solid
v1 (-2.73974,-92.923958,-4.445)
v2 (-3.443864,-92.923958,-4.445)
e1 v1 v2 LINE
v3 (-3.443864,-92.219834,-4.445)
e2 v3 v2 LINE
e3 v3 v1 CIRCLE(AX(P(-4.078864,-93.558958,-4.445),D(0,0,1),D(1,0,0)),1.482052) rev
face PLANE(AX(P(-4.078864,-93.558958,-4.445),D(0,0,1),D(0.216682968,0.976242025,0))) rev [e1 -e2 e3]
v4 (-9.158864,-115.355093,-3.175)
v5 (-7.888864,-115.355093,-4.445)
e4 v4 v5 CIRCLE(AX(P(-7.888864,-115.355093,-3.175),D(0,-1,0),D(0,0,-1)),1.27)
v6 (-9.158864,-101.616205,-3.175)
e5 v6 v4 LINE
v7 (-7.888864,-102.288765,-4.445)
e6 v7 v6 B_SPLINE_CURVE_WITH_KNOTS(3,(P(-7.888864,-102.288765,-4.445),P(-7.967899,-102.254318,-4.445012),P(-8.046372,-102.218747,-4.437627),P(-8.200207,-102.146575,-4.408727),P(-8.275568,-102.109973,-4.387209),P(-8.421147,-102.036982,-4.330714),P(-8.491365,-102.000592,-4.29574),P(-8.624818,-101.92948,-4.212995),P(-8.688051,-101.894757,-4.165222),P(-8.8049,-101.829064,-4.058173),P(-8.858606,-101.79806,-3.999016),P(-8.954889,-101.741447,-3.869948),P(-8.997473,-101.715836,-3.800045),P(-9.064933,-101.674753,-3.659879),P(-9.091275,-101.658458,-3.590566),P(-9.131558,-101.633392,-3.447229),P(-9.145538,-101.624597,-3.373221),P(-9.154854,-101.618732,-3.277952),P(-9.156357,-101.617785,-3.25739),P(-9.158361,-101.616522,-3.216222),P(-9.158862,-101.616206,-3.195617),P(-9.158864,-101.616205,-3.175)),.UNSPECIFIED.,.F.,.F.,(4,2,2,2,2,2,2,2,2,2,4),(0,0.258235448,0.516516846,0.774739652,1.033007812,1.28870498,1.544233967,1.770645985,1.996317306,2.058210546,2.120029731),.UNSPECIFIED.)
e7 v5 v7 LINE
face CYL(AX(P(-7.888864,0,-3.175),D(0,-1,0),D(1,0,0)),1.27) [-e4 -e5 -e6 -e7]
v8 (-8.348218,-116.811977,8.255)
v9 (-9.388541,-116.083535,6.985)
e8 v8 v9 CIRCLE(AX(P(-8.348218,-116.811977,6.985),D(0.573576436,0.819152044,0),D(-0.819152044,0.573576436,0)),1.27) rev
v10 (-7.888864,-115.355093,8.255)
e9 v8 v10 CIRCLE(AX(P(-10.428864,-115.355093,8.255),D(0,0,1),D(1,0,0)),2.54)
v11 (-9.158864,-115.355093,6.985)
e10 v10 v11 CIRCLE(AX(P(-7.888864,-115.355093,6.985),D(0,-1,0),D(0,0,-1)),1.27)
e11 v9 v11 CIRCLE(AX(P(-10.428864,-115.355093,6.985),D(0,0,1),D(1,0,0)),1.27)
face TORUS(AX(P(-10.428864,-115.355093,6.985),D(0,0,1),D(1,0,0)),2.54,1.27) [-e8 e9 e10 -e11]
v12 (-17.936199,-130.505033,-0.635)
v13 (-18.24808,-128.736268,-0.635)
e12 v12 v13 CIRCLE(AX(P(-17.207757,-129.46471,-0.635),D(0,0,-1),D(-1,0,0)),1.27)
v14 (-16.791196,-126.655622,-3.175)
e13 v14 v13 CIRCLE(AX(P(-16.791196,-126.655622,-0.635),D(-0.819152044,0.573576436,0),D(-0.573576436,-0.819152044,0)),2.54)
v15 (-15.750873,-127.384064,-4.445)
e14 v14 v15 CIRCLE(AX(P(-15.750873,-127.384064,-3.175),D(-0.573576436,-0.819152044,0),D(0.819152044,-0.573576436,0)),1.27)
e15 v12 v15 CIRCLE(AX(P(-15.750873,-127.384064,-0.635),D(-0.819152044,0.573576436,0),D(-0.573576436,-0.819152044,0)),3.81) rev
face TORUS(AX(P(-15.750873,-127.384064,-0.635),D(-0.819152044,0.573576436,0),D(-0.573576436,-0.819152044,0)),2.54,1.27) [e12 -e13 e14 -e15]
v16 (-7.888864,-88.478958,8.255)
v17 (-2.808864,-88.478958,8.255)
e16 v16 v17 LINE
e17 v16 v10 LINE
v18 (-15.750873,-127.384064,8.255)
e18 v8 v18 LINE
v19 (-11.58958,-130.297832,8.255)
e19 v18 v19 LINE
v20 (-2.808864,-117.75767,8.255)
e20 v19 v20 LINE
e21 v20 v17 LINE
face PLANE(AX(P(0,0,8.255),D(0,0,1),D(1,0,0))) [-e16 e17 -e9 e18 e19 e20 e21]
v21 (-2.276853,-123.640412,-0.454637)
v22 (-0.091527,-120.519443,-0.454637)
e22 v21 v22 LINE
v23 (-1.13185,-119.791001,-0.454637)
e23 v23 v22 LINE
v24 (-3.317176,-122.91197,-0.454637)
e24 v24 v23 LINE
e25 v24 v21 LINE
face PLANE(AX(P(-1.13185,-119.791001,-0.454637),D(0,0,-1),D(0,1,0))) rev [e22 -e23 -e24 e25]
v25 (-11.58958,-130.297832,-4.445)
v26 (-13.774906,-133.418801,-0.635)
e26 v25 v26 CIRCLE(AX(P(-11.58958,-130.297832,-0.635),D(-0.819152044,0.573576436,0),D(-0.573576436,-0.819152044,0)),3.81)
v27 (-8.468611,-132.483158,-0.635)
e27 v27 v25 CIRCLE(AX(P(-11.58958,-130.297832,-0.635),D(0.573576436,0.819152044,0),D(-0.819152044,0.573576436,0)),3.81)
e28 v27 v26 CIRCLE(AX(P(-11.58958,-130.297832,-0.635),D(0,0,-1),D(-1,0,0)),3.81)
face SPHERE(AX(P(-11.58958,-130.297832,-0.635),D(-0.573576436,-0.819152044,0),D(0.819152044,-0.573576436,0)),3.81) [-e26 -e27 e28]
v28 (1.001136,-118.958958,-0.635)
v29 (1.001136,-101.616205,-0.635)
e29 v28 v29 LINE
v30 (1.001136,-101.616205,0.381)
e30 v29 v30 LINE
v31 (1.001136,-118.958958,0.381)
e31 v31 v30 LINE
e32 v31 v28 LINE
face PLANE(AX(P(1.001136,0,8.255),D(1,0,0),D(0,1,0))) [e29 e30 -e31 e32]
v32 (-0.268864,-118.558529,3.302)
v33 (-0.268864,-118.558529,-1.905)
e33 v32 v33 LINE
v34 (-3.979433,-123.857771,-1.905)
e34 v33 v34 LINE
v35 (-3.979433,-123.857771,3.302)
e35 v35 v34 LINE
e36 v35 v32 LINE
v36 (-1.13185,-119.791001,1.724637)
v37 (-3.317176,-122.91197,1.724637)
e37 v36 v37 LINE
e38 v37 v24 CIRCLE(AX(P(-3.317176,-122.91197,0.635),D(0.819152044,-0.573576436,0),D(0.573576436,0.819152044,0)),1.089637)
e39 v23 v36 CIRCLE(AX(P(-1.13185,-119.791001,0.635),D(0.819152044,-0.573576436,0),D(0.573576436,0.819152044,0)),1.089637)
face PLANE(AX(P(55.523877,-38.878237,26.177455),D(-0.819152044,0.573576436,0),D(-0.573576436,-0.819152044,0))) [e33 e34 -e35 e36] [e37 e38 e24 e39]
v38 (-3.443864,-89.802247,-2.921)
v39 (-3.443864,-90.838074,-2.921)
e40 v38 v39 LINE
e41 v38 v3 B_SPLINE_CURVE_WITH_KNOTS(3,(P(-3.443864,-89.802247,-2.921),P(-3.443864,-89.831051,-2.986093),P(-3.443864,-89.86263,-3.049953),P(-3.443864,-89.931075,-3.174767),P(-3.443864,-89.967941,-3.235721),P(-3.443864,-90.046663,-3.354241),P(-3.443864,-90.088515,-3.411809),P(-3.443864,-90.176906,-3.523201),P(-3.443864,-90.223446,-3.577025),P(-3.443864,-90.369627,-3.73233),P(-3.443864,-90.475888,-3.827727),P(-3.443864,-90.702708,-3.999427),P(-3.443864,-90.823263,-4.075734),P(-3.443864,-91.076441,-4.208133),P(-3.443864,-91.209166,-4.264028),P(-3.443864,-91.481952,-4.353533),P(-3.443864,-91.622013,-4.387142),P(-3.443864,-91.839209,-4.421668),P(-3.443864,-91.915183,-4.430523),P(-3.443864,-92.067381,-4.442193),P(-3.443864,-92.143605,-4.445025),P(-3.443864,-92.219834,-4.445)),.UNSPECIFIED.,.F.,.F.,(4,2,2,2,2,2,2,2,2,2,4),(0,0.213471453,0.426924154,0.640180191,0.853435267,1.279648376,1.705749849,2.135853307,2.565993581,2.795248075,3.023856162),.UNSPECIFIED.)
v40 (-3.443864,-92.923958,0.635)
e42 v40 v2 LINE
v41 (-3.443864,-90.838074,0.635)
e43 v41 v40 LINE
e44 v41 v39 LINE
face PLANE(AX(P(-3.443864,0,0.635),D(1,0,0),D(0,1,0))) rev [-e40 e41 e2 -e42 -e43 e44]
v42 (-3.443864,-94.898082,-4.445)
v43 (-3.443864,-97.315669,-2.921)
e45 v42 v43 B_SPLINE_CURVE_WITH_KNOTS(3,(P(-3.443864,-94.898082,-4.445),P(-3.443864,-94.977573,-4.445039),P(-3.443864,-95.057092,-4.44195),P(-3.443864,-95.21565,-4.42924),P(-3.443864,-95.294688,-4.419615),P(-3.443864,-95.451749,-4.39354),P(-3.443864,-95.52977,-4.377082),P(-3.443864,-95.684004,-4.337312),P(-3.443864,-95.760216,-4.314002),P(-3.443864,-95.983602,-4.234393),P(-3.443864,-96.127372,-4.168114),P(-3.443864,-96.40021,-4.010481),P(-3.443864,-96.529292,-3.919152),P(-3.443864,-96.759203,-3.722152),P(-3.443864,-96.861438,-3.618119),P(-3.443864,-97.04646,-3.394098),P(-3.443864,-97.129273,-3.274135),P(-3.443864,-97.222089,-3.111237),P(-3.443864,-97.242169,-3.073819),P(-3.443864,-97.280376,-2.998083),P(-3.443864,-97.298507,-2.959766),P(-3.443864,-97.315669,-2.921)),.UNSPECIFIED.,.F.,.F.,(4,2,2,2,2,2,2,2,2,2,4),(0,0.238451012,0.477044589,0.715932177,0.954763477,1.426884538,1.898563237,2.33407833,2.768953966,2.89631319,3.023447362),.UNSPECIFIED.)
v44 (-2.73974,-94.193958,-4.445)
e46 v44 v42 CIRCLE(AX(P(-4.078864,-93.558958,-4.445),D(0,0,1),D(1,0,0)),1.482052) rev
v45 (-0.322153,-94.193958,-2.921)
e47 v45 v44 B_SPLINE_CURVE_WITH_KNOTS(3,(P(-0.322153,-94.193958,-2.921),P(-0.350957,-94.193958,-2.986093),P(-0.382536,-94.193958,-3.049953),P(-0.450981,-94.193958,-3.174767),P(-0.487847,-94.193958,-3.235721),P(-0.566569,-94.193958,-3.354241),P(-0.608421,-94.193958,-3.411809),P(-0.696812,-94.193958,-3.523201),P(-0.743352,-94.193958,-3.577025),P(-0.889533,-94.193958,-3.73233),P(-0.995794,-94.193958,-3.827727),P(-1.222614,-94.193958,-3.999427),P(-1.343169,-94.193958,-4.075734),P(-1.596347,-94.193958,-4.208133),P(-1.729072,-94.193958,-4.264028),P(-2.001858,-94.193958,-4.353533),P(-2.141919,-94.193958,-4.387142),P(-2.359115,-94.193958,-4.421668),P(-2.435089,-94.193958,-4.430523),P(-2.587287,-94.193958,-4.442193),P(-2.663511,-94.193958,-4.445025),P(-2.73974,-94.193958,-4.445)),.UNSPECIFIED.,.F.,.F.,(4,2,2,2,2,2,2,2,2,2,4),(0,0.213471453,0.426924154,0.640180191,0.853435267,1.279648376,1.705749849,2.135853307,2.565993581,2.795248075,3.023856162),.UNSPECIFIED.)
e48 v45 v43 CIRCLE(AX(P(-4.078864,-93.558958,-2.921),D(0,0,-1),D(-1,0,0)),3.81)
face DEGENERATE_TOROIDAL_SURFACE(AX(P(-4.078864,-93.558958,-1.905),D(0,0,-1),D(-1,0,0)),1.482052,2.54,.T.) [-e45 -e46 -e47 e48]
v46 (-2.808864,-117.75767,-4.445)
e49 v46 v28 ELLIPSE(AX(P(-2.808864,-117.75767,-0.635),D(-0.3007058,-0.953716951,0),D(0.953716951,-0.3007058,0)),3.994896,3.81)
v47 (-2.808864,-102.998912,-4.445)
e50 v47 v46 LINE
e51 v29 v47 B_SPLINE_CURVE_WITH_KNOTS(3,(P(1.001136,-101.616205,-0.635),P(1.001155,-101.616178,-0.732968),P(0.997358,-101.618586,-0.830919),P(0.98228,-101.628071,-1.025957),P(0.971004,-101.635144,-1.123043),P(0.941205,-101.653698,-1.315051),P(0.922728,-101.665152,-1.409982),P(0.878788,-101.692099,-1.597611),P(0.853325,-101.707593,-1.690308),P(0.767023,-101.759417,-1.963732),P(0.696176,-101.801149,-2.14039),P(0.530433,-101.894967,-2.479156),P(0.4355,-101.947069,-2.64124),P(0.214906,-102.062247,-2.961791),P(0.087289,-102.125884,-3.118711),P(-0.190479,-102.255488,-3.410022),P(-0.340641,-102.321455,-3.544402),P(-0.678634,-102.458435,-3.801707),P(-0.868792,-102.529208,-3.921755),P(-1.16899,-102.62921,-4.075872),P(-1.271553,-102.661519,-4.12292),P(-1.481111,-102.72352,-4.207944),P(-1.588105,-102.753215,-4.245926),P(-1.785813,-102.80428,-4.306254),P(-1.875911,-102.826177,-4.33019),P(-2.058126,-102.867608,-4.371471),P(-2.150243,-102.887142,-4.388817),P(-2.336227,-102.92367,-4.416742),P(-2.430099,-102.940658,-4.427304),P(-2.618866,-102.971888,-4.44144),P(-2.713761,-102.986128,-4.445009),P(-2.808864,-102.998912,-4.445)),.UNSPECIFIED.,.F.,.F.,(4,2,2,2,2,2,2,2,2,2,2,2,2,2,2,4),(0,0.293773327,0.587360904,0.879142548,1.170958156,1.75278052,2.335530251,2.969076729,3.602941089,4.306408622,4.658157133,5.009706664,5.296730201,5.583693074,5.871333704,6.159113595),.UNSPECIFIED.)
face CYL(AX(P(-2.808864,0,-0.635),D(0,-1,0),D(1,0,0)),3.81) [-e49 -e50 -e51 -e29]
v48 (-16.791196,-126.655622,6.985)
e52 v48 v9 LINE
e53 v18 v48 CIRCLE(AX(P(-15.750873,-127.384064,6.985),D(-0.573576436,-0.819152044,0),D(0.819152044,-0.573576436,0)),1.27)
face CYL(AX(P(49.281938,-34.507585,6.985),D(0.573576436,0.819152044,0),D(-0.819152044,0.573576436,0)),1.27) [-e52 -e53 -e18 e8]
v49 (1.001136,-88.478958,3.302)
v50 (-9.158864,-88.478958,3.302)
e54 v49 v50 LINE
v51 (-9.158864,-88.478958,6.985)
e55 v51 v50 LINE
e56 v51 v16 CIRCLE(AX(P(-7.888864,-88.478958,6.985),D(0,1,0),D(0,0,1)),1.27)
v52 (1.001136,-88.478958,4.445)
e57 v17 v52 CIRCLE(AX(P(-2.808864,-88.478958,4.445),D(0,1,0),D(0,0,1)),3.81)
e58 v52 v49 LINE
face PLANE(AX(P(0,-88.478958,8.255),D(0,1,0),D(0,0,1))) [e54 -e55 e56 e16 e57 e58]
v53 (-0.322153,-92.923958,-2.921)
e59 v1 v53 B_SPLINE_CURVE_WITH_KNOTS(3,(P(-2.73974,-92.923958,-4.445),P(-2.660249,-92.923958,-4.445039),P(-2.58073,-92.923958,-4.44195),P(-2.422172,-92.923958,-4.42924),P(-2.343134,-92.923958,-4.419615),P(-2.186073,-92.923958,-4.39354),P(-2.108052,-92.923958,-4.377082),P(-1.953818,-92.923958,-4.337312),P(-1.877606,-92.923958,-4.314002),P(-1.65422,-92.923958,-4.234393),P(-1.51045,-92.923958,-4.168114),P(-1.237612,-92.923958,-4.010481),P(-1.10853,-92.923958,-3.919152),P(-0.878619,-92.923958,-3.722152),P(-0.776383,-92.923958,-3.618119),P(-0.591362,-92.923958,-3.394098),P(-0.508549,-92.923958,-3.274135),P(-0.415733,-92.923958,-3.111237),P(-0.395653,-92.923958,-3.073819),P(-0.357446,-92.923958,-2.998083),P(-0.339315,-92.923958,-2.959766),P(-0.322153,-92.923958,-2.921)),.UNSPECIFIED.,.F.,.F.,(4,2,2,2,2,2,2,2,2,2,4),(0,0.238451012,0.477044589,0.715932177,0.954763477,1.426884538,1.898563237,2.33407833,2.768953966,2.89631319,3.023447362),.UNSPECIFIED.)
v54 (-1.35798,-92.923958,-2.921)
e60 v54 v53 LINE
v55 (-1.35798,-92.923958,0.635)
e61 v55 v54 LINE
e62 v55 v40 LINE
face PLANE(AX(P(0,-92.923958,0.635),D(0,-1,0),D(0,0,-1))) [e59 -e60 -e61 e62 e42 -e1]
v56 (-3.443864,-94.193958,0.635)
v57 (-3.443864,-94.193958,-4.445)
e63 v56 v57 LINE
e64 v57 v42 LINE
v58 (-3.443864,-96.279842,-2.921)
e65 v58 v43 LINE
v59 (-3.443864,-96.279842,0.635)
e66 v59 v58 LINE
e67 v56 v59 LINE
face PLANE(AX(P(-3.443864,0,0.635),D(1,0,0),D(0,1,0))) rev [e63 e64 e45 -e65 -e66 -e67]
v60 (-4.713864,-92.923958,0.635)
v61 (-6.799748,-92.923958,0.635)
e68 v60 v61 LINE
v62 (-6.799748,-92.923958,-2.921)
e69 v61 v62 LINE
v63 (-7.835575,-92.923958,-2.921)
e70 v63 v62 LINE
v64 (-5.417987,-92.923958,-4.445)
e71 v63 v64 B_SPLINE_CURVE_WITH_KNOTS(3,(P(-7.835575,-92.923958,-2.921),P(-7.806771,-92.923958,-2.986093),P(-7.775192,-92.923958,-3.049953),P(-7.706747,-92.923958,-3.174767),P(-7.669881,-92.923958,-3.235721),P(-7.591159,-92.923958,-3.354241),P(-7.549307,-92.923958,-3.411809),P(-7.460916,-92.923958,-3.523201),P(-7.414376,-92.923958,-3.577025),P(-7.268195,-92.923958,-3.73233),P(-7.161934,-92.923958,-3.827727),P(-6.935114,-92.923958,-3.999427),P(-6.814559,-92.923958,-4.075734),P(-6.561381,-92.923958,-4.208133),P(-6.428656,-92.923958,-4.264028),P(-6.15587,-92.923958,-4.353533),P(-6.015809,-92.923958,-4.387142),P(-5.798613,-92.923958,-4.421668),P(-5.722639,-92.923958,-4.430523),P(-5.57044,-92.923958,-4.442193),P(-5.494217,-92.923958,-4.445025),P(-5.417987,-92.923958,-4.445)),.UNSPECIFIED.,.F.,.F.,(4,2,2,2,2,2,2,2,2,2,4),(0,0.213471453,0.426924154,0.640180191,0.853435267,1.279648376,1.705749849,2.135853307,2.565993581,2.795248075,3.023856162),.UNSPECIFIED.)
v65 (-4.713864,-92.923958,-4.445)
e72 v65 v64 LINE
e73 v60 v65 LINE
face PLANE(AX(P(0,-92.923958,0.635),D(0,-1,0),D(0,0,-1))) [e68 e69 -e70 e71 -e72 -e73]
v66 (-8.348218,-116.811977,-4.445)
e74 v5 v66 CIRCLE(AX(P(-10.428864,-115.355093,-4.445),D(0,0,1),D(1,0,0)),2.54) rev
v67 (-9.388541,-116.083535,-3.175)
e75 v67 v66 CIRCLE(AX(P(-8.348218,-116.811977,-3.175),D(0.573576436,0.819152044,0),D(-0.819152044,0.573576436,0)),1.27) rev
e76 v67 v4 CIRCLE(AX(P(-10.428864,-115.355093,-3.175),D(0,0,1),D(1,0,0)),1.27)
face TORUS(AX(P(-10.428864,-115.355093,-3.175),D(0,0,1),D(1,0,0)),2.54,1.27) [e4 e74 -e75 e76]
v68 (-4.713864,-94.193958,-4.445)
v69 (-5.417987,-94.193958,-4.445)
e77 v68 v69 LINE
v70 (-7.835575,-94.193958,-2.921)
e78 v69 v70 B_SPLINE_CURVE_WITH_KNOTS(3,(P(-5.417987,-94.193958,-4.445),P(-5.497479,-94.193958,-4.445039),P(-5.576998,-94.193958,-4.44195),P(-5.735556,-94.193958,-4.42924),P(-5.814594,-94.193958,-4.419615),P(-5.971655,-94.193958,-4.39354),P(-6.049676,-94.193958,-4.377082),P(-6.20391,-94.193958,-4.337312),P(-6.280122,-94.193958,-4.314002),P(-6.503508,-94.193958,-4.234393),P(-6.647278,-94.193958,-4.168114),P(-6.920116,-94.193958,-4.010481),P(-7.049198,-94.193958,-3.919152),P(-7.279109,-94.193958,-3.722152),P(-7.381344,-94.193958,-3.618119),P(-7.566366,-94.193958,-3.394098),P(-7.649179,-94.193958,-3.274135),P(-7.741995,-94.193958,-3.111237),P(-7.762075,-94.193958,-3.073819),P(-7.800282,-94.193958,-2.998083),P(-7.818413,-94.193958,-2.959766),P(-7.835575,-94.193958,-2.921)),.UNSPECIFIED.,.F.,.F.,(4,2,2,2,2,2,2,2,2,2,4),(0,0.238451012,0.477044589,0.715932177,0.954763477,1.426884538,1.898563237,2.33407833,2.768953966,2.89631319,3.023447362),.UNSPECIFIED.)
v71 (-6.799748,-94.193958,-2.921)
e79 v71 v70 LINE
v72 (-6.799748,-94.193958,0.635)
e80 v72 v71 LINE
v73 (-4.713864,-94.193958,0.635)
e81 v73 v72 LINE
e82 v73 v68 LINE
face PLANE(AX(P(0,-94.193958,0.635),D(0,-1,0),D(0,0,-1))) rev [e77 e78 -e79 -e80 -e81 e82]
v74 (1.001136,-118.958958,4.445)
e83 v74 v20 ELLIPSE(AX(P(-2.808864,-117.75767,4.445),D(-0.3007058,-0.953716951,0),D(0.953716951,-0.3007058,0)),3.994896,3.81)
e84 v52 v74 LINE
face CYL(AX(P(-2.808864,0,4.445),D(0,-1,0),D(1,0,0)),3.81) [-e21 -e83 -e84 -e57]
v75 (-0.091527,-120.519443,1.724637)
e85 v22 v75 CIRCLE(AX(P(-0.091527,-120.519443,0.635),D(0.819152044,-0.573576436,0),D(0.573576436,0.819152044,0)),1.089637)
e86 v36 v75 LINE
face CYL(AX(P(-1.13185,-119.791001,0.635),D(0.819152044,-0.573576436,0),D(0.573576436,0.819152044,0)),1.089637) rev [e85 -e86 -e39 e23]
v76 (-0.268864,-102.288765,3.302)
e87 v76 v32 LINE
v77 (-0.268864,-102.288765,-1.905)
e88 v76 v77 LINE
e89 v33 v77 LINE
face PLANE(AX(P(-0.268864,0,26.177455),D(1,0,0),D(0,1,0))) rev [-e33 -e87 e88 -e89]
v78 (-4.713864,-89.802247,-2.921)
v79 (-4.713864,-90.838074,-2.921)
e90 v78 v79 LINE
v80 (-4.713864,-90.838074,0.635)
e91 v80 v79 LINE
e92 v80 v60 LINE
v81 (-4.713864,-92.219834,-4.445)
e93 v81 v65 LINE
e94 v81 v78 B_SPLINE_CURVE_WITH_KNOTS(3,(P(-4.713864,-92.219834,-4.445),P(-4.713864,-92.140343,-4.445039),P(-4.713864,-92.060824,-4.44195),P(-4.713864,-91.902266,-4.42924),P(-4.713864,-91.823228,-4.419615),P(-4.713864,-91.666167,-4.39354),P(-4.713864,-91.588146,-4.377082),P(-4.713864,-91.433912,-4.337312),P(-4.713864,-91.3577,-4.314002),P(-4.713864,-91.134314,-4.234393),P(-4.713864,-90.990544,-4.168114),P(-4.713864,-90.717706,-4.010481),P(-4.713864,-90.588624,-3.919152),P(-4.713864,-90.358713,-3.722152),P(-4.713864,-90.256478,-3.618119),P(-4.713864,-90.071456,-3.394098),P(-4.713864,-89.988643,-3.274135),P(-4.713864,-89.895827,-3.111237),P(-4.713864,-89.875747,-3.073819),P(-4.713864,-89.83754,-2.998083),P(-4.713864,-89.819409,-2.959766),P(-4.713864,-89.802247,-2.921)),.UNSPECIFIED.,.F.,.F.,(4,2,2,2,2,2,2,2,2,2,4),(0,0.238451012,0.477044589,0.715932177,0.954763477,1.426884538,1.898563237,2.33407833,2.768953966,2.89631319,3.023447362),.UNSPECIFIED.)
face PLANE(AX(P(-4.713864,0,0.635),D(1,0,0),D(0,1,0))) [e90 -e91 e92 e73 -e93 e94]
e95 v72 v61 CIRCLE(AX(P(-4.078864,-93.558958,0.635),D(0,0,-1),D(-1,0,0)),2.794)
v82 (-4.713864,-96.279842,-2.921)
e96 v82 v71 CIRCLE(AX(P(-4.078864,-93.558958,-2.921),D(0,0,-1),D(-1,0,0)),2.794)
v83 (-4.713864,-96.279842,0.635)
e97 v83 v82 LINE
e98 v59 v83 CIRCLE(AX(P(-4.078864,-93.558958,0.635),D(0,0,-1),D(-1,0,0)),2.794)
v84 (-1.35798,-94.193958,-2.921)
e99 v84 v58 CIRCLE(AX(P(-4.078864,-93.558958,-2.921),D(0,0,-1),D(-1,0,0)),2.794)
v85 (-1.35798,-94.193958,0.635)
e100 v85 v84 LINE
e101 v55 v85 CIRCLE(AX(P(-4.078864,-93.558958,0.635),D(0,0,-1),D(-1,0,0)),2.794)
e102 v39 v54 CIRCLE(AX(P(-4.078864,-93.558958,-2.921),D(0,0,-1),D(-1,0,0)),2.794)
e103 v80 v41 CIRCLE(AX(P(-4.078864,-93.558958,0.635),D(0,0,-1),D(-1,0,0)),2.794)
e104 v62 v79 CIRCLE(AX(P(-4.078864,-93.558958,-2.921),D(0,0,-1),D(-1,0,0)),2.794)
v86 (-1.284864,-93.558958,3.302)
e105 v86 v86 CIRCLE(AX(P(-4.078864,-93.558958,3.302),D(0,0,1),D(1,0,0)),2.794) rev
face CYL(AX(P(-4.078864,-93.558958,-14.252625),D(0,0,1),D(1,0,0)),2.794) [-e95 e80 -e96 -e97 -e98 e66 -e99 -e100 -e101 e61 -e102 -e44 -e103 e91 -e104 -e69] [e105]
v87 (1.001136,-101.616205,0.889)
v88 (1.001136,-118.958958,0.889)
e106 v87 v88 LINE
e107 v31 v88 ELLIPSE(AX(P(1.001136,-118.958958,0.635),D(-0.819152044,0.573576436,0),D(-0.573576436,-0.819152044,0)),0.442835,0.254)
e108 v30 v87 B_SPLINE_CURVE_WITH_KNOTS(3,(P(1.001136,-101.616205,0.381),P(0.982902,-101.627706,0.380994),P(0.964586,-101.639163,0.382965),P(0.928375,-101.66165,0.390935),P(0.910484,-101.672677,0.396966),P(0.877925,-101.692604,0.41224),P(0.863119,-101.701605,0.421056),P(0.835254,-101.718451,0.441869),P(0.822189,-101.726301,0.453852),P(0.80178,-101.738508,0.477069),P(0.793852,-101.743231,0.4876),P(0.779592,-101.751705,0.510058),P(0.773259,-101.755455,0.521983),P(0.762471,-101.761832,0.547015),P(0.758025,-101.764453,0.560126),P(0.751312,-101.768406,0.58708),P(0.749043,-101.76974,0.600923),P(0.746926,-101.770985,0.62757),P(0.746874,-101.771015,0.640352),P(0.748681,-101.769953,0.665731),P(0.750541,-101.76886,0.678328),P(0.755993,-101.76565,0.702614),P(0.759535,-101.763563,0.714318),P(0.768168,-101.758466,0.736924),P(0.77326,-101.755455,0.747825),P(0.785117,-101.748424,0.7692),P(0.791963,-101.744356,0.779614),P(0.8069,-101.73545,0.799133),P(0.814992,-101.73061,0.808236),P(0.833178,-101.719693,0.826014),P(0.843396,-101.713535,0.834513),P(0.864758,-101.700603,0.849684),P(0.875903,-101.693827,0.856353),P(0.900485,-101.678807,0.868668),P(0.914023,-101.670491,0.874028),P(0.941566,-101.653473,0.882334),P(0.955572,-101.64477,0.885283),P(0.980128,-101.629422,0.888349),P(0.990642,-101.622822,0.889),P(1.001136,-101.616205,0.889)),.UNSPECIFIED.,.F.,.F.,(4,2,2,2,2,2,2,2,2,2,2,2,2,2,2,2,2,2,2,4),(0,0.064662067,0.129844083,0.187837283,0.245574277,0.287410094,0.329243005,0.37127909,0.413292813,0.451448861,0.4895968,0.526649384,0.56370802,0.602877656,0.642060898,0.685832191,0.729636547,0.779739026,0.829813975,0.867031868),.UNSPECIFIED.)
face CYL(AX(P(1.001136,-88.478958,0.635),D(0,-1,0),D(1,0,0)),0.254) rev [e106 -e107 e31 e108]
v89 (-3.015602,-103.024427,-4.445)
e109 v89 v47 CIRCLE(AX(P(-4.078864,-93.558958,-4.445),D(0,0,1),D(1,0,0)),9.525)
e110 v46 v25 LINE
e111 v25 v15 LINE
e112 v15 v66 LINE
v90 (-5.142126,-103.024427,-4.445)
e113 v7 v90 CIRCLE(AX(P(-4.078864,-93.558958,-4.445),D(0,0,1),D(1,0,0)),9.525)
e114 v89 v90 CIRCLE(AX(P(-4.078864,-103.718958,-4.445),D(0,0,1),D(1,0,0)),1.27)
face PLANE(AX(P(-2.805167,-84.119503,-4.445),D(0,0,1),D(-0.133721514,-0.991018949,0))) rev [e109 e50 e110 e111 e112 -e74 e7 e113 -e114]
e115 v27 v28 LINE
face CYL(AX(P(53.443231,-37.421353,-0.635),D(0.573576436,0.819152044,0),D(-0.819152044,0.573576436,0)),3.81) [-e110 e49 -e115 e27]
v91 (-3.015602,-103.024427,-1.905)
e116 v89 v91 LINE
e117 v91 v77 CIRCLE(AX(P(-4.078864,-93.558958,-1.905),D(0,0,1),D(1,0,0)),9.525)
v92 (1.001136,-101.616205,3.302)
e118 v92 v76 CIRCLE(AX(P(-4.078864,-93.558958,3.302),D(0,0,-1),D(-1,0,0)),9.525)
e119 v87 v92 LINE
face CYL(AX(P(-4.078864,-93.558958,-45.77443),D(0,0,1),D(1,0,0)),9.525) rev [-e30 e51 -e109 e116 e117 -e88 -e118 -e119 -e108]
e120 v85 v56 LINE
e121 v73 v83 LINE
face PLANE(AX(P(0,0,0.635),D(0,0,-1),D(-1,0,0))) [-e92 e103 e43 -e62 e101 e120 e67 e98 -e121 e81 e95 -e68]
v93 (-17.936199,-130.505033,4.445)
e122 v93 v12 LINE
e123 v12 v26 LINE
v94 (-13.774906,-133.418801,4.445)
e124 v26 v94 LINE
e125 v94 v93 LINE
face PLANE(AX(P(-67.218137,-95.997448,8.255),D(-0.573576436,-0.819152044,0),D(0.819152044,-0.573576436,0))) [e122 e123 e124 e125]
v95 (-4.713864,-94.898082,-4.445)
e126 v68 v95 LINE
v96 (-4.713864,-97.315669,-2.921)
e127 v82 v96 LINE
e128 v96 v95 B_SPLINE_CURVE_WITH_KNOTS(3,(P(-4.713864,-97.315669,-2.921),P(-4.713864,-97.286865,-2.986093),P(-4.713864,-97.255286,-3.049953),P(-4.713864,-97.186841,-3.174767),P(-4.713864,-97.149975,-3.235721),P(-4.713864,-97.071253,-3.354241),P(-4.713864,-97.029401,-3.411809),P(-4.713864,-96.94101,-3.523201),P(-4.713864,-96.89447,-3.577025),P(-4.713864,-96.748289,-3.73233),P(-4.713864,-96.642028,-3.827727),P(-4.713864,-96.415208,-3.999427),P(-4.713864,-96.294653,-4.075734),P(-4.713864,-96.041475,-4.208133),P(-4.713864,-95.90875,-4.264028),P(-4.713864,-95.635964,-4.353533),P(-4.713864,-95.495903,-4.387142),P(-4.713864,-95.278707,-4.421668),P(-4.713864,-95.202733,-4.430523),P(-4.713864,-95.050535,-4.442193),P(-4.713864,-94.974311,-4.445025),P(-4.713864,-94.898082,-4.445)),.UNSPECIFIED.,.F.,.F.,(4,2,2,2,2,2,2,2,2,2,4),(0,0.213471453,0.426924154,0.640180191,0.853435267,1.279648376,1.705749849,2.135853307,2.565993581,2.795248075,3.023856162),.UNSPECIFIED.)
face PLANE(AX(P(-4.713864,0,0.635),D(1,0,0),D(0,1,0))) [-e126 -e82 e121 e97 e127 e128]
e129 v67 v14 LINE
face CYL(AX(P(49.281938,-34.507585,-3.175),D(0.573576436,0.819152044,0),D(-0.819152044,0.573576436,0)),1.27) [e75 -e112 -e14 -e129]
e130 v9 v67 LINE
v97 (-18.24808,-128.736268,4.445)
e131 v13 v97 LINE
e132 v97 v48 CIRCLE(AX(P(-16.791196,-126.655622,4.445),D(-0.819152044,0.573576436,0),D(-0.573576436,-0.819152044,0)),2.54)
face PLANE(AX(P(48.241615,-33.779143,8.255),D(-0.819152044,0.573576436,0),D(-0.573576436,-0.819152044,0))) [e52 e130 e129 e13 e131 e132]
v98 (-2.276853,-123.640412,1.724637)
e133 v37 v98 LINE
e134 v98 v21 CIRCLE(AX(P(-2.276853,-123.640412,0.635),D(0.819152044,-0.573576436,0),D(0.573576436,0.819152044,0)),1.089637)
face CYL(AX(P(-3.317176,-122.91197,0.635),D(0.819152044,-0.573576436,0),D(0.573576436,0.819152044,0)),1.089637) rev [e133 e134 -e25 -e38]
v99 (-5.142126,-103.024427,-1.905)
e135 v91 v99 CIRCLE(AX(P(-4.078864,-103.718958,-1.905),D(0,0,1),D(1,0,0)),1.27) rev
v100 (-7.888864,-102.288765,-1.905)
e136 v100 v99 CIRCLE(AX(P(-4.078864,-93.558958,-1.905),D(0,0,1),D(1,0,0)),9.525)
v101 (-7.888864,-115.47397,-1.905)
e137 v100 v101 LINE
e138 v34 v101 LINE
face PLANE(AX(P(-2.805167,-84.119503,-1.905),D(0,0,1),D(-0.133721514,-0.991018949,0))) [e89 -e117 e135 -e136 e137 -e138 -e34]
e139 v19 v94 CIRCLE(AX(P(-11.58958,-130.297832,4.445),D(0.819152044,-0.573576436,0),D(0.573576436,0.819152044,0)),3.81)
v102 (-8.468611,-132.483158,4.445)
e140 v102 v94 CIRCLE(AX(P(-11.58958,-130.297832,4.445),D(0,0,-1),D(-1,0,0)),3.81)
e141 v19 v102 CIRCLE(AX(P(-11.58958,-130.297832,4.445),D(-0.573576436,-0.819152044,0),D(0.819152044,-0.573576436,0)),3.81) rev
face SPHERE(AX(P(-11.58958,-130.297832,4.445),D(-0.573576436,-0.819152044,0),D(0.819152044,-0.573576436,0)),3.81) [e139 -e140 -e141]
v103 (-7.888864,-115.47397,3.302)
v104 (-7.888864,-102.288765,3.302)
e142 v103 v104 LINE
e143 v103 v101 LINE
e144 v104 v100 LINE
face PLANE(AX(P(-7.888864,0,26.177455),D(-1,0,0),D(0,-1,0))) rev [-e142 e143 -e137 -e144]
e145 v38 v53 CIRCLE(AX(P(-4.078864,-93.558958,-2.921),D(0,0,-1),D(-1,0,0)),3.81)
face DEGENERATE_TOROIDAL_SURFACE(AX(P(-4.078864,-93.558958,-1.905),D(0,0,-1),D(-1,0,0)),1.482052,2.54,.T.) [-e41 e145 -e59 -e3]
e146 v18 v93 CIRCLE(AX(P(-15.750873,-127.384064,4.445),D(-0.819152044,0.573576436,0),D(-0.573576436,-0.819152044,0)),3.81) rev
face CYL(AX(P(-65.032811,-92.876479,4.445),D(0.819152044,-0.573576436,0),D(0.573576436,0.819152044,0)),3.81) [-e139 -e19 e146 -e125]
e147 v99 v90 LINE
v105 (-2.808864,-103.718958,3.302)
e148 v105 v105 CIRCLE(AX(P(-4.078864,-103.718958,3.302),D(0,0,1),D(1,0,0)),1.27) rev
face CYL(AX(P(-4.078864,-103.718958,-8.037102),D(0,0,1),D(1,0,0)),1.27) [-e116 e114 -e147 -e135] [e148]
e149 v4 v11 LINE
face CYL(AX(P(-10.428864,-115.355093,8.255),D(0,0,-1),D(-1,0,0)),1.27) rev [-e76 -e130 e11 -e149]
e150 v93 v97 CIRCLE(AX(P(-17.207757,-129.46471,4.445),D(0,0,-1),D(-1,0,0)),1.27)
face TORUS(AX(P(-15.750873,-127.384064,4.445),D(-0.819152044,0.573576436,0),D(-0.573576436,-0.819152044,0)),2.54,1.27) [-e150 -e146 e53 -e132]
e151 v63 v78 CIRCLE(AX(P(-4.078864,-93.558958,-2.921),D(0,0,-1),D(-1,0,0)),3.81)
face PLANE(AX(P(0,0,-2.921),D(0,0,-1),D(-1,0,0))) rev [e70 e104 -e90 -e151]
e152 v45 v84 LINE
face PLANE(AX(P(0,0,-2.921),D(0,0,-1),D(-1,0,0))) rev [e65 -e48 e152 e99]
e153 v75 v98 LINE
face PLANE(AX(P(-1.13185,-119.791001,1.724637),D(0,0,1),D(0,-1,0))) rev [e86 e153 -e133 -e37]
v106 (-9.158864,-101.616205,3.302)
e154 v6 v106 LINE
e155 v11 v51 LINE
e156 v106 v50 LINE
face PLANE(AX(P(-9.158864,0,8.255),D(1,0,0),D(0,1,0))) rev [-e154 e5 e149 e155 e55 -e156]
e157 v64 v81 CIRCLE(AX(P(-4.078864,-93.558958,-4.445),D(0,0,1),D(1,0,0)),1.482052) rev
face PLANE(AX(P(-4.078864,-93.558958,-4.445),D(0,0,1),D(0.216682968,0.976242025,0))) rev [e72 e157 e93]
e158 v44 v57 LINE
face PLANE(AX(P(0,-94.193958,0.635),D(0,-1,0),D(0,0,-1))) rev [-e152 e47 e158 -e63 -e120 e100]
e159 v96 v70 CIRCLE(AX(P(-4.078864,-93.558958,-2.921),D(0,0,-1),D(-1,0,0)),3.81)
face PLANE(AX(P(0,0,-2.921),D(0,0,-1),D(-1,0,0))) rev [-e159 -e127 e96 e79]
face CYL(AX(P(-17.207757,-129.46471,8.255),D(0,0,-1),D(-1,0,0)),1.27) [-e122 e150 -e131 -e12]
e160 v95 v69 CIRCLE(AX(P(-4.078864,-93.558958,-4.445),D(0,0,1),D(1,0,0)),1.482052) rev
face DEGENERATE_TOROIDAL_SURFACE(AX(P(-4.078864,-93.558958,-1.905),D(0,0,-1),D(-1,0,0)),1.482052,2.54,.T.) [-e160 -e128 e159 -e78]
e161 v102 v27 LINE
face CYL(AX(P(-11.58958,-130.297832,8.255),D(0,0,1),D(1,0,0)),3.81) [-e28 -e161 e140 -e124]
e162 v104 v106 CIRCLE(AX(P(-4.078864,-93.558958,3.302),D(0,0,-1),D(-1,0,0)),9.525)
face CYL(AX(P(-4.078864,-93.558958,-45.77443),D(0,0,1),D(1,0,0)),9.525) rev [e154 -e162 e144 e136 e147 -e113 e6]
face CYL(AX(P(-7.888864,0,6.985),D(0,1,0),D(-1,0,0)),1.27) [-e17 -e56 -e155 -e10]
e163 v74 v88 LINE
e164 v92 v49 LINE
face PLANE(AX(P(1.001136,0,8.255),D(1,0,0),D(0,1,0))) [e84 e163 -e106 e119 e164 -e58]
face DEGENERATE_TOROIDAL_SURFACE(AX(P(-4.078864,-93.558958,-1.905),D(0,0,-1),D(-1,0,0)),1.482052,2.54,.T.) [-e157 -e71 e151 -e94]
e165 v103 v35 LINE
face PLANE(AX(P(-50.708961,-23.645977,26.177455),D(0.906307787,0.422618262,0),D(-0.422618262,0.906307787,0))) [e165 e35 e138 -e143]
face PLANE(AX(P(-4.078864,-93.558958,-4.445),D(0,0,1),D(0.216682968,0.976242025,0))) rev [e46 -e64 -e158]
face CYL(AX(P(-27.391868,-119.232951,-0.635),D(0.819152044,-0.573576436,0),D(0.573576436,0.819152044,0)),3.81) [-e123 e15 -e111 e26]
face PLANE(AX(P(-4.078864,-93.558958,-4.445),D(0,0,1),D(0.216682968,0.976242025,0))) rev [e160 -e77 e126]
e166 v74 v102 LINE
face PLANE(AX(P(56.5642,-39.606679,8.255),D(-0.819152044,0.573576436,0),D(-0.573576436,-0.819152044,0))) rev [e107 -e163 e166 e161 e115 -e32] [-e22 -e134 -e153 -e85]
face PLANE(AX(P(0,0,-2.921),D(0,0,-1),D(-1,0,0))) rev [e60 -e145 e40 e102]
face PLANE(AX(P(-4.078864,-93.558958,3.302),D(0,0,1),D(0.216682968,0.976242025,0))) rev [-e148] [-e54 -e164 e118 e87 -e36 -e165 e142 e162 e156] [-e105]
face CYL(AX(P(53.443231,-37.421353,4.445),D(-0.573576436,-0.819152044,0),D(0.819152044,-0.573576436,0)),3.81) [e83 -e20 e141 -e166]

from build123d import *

# Parameters (mm, degrees)
BOSS_EXTRUDE1_DEPTH      = 5.715
BOSS_EXTRUDE1_DEPTH_BACK = 4.445
SKETCH2_R                = 2.7940000000000054
SKETCH3_W                = 1.269999999999993
SKETCH3_H                = 1.2700000000000102
CUT_EXTRUDE1_DEPTH       = 5.08
BOSS_EXTRUDE2_DEPTH      = 1.524
FILLET1_R                = 2.54
BOSS_EXTRUDE3_DEPTH      = 2.54
BOSS_EXTRUDE3_DEPTH_BACK = 2.413
SKETCH5_R                = 2.7940000000000054
BOSS_EXTRUDE4_DEPTH      = 7.747
CUT_EXTRUDE2_START       = -1.397
CUT_EXTRUDE2_DEPTH       = 5.207
CUT_EXTRUDE5_DEPTH       = 1.27
BOSS_EXTRUDE5_REACH      = 139.144
SKETCH11_R               = 1.2700000000000067
CUT_EXTRUDE6_DEPTH       = 37.8413328747807
CUT_EXTRUDE6_DEPTH_BACK  = 37.8413328747807
SKETCH12_R               = 0.25399999999999967
FILLET2_R                = 3.8099999999999996
FILLET3_R                = 3.8099999999999996
FILLET4_R                = 1.27


with BuildPart() as part:
    # Sketch2 → Boss-Extrude1 (new, two sides: drawn at the far end of the back side and taken through both)
    with BuildSketch(Plane.XY.offset(-BOSS_EXTRUDE1_DEPTH_BACK)):
        with Locations((-4.07886393202022, -93.55895801032833)):
            Circle(SKETCH2_R)
    extrude(amount=BOSS_EXTRUDE1_DEPTH + BOSS_EXTRUDE1_DEPTH_BACK)

    # Sketch3 → Cut-Extrude1 (cut)
    with BuildSketch(Plane(origin=(0, 0, -4.445), x_dir=(-1, 0, 0), z_dir=(0, 0, -1))):
        with BuildLine():
            Line((3.443863932020214, -94.1939580103283), (3.443863932020214, -92.9239580103283))
            Line((3.4438639320202142, -92.9239580103283), (1.357979700745413, -92.9239580103283))
            ThreePointArc((1.3579797007454042, -92.92395801032826), (1.3032030609678973, -93.23936024921431), (1.2848639320202149, -93.55895801032833))
            ThreePointArc((1.2848639320202149, -93.55895801032833), (1.3032030609678946, -93.87855577144232), (1.3579797007453935, -94.19395801032834))
            Line((1.357979700745402, -94.1939580103283), (3.4438639320202142, -94.1939580103283))
        make_face()
        with Locations((4.0788639320202105, -93.5589580103283)):
            Rectangle(SKETCH3_W, SKETCH3_H)
        with BuildLine():
            ThreePointArc((4.713863932020238, -90.8380737790535), (4.398461693134176, -90.783297139276), (4.078863932020155, -90.76495801032831))
            ThreePointArc((4.078863932020155, -90.76495801032831), (3.7592661709062294, -90.783297139276), (3.4438639320202613, -90.83807377905349))
            Line((3.4438639320202147, -90.83807377905347), (3.443863932020214, -92.9239580103283))
            Line((3.4438639320202142, -92.9239580103283), (4.713863932020207, -92.9239580103283))
            Line((4.713863932020207, -92.9239580103283), (4.713863932020208, -90.8380737790535))
        make_face()
        with BuildLine():
            Line((6.7997481632950585, -92.9239580103283), (4.713863932020207, -92.9239580103283))
            Line((4.713863932020207, -92.9239580103283), (4.713863932020207, -94.1939580103283))
            Line((4.713863932020207, -94.1939580103283), (6.7997481632950665, -94.1939580103283))
            ThreePointArc((6.79974816329506, -94.19395801032829), (6.854524803072549, -93.87855577144228), (6.872863932020225, -93.55895801032833))
            ThreePointArc((6.872863932020225, -93.55895801032833), (6.854524803072548, -93.23936024921436), (6.799748163295054, -92.92395801032833))
        make_face()
        with BuildLine():
            Line((4.713863932020207, -94.1939580103283), (3.4438639320202142, -94.1939580103283))
            Line((3.443863932020214, -94.1939580103283), (3.443863932020213, -96.27984224160318))
            ThreePointArc((3.4438639320202564, -96.27984224160316), (3.759266170906339, -96.33461888138066), (4.078863932020378, -96.35295801032834))
            ThreePointArc((4.078863932020378, -96.35295801032834), (4.398461693134285, -96.33461888138064), (4.713863932020234, -96.27984224160315))
            Line((4.713863932020206, -96.27984224160315), (4.713863932020207, -94.1939580103283))
        make_face()
    extrude(amount=-CUT_EXTRUDE1_DEPTH, mode=Mode.SUBTRACT)

    # Sketch4 → Boss-Extrude2 (add)
    with BuildSketch(Plane(origin=(0, 0, -4.445), x_dir=(-1, 0, 0), z_dir=(0, 0, -1))):
        with BuildLine():
            Line((0.3221532697519658, -92.9239580103283), (1.3579797007453935, -92.9239580103283))
            ThreePointArc((1.3579797007453953, -92.9239580103283), (2.103207585385001, -91.58330166369309), (3.4438639320202142, -90.83807377905349))
            Line((3.4438639320202116, -90.83807377905349), (3.443863932020211, -89.80224734806006))
            ThreePointArc((3.443863932020212, -89.80224734806006), (1.3847870956994783, -90.86488117400758), (0.32215326975196623, -92.9239580103283))
        make_face()
        with BuildLine():
            Line((3.4438639320202147, -97.31566867259657), (3.4438639320202142, -96.27984224160315))
            ThreePointArc((3.4438639320202133, -96.27984224160315), (2.1032075853849914, -95.53461435696353), (1.357979700745386, -94.1939580103283))
            Line((1.357979700745385, -94.1939580103283), (0.32215326975196246, -94.1939580103283))
            ThreePointArc((0.3221532697519591, -94.1939580103283), (1.384787095699461, -96.25303484664906), (3.443863932020211, -97.31566867259659))
        make_face()
        with BuildLine():
            Line((4.713863932020205, -96.27984224160316), (4.713863932020205, -97.31566867259659))
            ThreePointArc((4.713863932020205, -97.31566867259659), (6.772940768340969, -96.25303484664907), (7.835574594288481, -94.1939580103283))
            Line((7.835574594288476, -94.1939580103283), (6.799748163295053, -94.1939580103283))
            ThreePointArc((6.7997481632950505, -94.1939580103283), (6.054520278655442, -95.53461435696354), (4.713863932020206, -96.27984224160316))
        make_face()
        with BuildLine():
            Line((4.713863932020206, -89.80224734806005), (4.713863932020206, -90.83807377905347))
            ThreePointArc((4.713863932020207, -90.83807377905347), (6.054520278655426, -91.58330166369309), (6.799748163295044, -92.9239580103283))
            Line((6.799748163295046, -92.9239580103283), (7.835574594288472, -92.9239580103283))
            ThreePointArc((7.835574594288474, -92.9239580103283), (6.772940768340954, -90.86488117400756), (4.713863932020203, -89.80224734806006))
        make_face()
    extrude(amount=-BOSS_EXTRUDE2_DEPTH)

    # Fillet1
    # the kernel refuses this fillet: 2.54 mm, written as the material it takes off along each edge
    with BuildSketch(Plane(origin=(-4.0788639320202495, -93.55895801032834, -4.445), x_dir=(-0.9779601169479317, 0.2087917854207577, 0), z_dir=(-0.2087917854207577, -0.9779601169479317, 0))) as fillet1_piece_1:
        with BuildLine():
            CenterArc((1.4820515469624638, -2.54), FILLET1_R, 23.578178478201842, 66.42182152179817)
            Line((1.4820515469624638, 0), (1.4820515469624638, 0.05079999999999973))
            Line((1.4820515469624638, 0.05079999999999973), (3.8100000000000294, 0.05079999999999973))
            Line((3.8100000000000294, 0.05079999999999973), (3.8608000000000278, 0))
            ThreePointArc((3.8608000000000278, 0), (3.860800000000029, -0.762), (3.8565589690607793, -1.5036800000000001))
            Line((3.8565589690607793, -1.5036800000000001), (3.81000000000003, -1.524))
        make_face()
    revolve(axis=Axis((-4.0788639320202495, -93.55895801032834, -4.445), (0, 0, -1)), revolution_arc=245.89688563167445, mode=Mode.SUBTRACT)
    with BuildSketch(Plane(origin=(-4.078863932020237, -93.55895801032833, -4.445), x_dir=(0.20879178542072774, 0.9779601169479382, 0), z_dir=(-0.9779601169479382, 0.20879178542072774, 0))) as fillet1_piece_2:
        with BuildLine():
            CenterArc((1.4820515469624473, -2.54), FILLET1_R, 23.578178478201917, 66.42182152179808)
            Line((1.4820515469624473, 0), (1.4820515469624473, 0.05079999999999973))
            Line((1.4820515469624473, 0.05079999999999973), (3.8100000000000094, 0.05079999999999973))
            Line((3.8100000000000094, 0.05079999999999973), (3.8608000000000127, 0))
            ThreePointArc((3.8608000000000127, 0), (3.8608000000000127, -0.7619999999999991), (3.8565589690607562, -1.5036799999999984))
            Line((3.8565589690607562, -1.5036799999999984), (3.810000000000009, -1.5239999999999982))
        make_face()
    revolve(axis=Axis((-4.078863932020237, -93.55895801032833, -4.445), (0, 0, -1)), revolution_arc=245.89688563167698, mode=Mode.SUBTRACT)
    with BuildSketch(Plane(origin=(-4.078863932020216, -93.55895801032833, -4.445), x_dir=(0.9779601169479387, -0.2087917854207255, 0), z_dir=(0.2087917854207255, 0.9779601169479387, 0))) as fillet1_piece_3:
        with BuildLine():
            CenterArc((1.482051546962437, -2.5400000000000005), FILLET1_R, 23.578178478201817, 66.42182152179818)
            Line((1.482051546962437, 0), (1.482051546962437, 0.05079999999999975))
            Line((1.482051546962437, 0.05079999999999975), (3.8100000000000045, 0.05079999999999975))
            Line((3.8100000000000045, 0.05079999999999975), (3.860800000000004, 0))
            ThreePointArc((3.860800000000004, 0), (3.860800000000005, -0.7620000000000007), (3.856558969060754, -1.503680000000001))
            Line((3.856558969060754, -1.503680000000001), (3.810000000000004, -1.524000000000001))
        make_face()
    revolve(axis=Axis((-4.078863932020216, -93.55895801032833, -4.445), (0, 0, -1)), revolution_arc=245.89688563167826, mode=Mode.SUBTRACT)
    with BuildSketch(Plane(origin=(-4.078863932020221, -93.55895801032833, -4.445), x_dir=(-0.20879178542073795, -0.9779601169479358, 0), z_dir=(0.9779601169479358, -0.20879178542073795, 0))) as fillet1_piece_4:
        with BuildLine():
            CenterArc((1.482051546962436, -2.5399999999999996), FILLET1_R, 23.57817847820183, 66.42182152179817)
            Line((1.482051546962436, 0), (1.482051546962436, 0.05079999999999972))
            Line((1.482051546962436, 0.05079999999999972), (3.8100000000000027, 0.05079999999999972))
            Line((3.8100000000000027, 0.05079999999999972), (3.8608000000000064, 0))
            ThreePointArc((3.8608000000000064, 0), (3.8608000000000064, -0.7619999999999998), (3.85655896906075, -1.5036799999999997))
            Line((3.85655896906075, -1.5036799999999997), (3.8100000000000027, -1.5239999999999996))
        make_face()
    revolve(axis=Axis((-4.078863932020221, -93.55895801032833, -4.445), (0, 0, -1)), revolution_arc=245.8968856316771, mode=Mode.SUBTRACT)

    # Sketch5 → Boss-Extrude3 (add, two sides: drawn at the far end of the back side and taken through both)
    # profile 1 of 4: a face of its own
    with BuildSketch(Plane.XY.offset(5.714999999999999).offset(-BOSS_EXTRUDE3_DEPTH_BACK)):
        Polygon((-7.321448701996411, -113.13142141700175), (1.001136067979783, -118.95895801032833), (1.0011360679797812, -88.47895801032831), (-9.158863932020221, -88.47895801032831), (-9.158863932020218, -115.75552231531789), align=None)
        with Locations((-4.07886393202022, -93.55895801032833)):
            Circle(SKETCH5_R, mode=Mode.SUBTRACT)
    # profile 2 of 4: a face of its own
    with BuildSketch(Plane.XY.offset(5.714999999999999).offset(-BOSS_EXTRUDE3_DEPTH_BACK)):
        Polygon((-9.158863932020218, -118.95895801032833), (1.0011360679797825, -118.95895801032833), (-7.321448701996411, -113.13142141700175), (-9.15886393202022, -115.75552231531789), align=None)
    # profile 3 of 4: a face of its own
    with BuildSketch(Plane.XY.offset(5.714999999999999).offset(-BOSS_EXTRUDE3_DEPTH_BACK)):
        Polygon((-18.97652188864955, -129.77659095695412), (-10.653937118673376, -135.6041275502807), (1.0011360679797825, -118.95895801032833), (-9.158863932020218, -118.95895801032833), (-9.158863932020218, -115.75552231531789), align=None)
    # profile 4 of 4: a face of its own
    with BuildSketch(Plane.XY.offset(5.714999999999999).offset(-BOSS_EXTRUDE3_DEPTH_BACK)):
        with Locations((-4.07886393202022, -93.55895801032833)):
            Circle(SKETCH5_R)
    extrude(amount=BOSS_EXTRUDE3_DEPTH + BOSS_EXTRUDE3_DEPTH_BACK)

    # Sketch6 → Boss-Extrude4 (add)
    with BuildSketch(Plane(origin=(0, 0, 3.3019999999999996), x_dir=(-1, 0, 0), z_dir=(0, 0, -1))):
        with BuildLine():
            ThreePointArc((9.158863932020274, -101.61620474851374), (4.078863932020362, -103.08395801032833), (-1.0011360679795924, -101.6162047485139))
            Line((-1.0011360679797843, -101.61620474851397), (-1.0011360679797883, -118.95895801032833))
            Line((-1.0011360679797883, -118.95895801032833), (10.653937118673378, -135.60412755028074))
            Line((10.65393711867338, -135.60412755028074), (18.976521888649547, -129.77659095695415))
            Line((18.976521888649547, -129.77659095695415), (9.158863932020218, -115.75552231531788))
            Line((9.158863932020218, -115.75552231531788), (9.15886393202022, -101.61620474851372))
        make_face()
    extrude(amount=BOSS_EXTRUDE4_DEPTH)

    # Sketch9 → Cut-Extrude2 (cut)
    with BuildSketch(Plane(origin=(0, 0, 1.9049999999999978), x_dir=(-1, 0, 0), z_dir=(0, 0, -1)).offset(CUT_EXTRUDE2_START)):
        with BuildLine():
            ThreePointArc((7.8888639320202145, -102.2887647092192), (4.078863932020218, -103.08395801032832), (0.26886393202022063, -102.2887647092192))
            Line((0.2688639320202225, -102.2887647092192), (0.26886393202022446, -118.55852854845203))
            Line((0.2688639320202246, -118.55852854845203), (3.9794333963345054, -123.8577709327907))
            Line((3.9794333963345054, -123.8577709327907), (7.888863932020215, -115.47397009376135))
            Line((7.888863932020215, -115.47397009376135), (7.888863932020214, -102.2887647092192))
        make_face()
    extrude(amount=CUT_EXTRUDE2_DEPTH, mode=Mode.SUBTRACT)

    # Sketch10 → Cut-Extrude5 (cut)
    with BuildSketch(Plane(origin=(56.56419989406226, -39.606679158622775, 0), x_dir=(0, 0, -1), z_dir=(0.8191520442889951, -0.5735764363510415, 0))):
        with BuildLine():
            Line((0.45463666916395357, -98.77624558247483), (0.45463666916395473, -102.58624558247485))
            ThreePointArc((0.45463666916395473, -102.58624558247485), (-0.6349999999999958, -103.6758822516388), (-1.7246366691639448, -102.58624558247485))
            Line((-1.7246366691639448, -102.58624558247485), (-1.7246366691639459, -98.77624558247483))
            ThreePointArc((-1.7246366691639459, -98.77624558247483), (-0.6349999999999967, -97.68660891331088), (0.45463666916395357, -98.77624558247483))
        make_face()
    extrude(amount=-CUT_EXTRUDE5_DEPTH, mode=Mode.SUBTRACT)

    # Boss-Extrude5: up to this face of the body (flat: up to its plane)
    boss_extrude5_end = Plane(part.part.faces().sort_by_distance((-6.926760918, -118.442460809, -4.445))[0])
    # Sketch11 → Boss-Extrude5 (add, up to the picked face)
    with BuildSketch(Plane(origin=(0, 0, 3.3019999999999996), x_dir=(-1, 0, 0), z_dir=(0, 0, -1)), mode=Mode.PRIVATE) as boss_extrude5_sk1:
        with Locations(Location((4.07886393202022, -103.71895801032832, 0), (0, 0, 180))):
            Circle(SKETCH11_R)
    boss_extrude5_tool1 = split(extrude(boss_extrude5_sk1.sketch, amount=BOSS_EXTRUDE5_REACH, mode=Mode.PRIVATE), bisect_by=boss_extrude5_end, keep=Keep.BOTH, mode=Mode.PRIVATE)
    add(boss_extrude5_tool1.solids().sort_by(Axis((-4.078864, -103.718958, 3.302), (0, 0, -1)))[0])

    # Sketch12 → Cut-Extrude6 (cut, two sides: drawn at the far end of the back side and taken through both)
    with BuildSketch(Plane(origin=(6.77e-15, -118.95895801032833, 0), x_dir=(1.64e-15, 0, -1), z_dir=(6e-17, -1, 0)).offset(-CUT_EXTRUDE6_DEPTH_BACK)):
        with Locations((-0.6349999999999941, 1.0011360679797785)):
            Circle(SKETCH12_R)
    extrude(amount=CUT_EXTRUDE6_DEPTH + CUT_EXTRUDE6_DEPTH_BACK, mode=Mode.SUBTRACT)

    # Fillet2
    fillet2_edges = [part.edges().sort_by_distance(p)[0] for p in [
        (1.001136067979782, -103.71895801032832, 8.254999999999999),
        (-4.826400525346797, -127.28154278030452, 8.254999999999999),
        (-4.826400525346795, -127.28154278030453, -4.445),
        (1.0011360679797863, -110.28758137942114, -4.445),
    ]]
    fillet(fillet2_edges, radius=FILLET2_R)

    # Fillet3
    fillet3_edges = [part.edges().sort_by_distance(p)[0] for p in [
        (-16.375714148031996, -131.5976961423687, -4.445),
        (-10.653937118673378, -135.60412755028074, 1.9049999999999985),
        (-16.375714148032003, -131.59769614236868, 8.254999999999999),
        (-11.568047859470695, -134.964060318816, 7.139076836320746),
        (-11.568047859470676, -134.964060318816, -3.3290768363207524),
    ]]
    fillet(fillet3_edges, radius=FILLET3_R)

    # Fillet4
    fillet4_edges = [part.edges().sort_by_distance(p)[0] for p in [
        (-9.158863932020218, -115.75552231531788, 1.9049999999999994),
        (-9.15886393202022, -102.1172401628231, 8.254999999999999),
        (-9.158863932020218, -108.6858635319158, -4.445),
        (-12.975029799086151, -121.20557199176548, -4.445),
        (-12.975029799086162, -121.20557199176548, 8.254999999999999),
        (-18.976521888649547, -129.77659095695415, 1.9049999999999994),
        (-18.336454657184845, -128.86248021615683, -3.329076836320745),
        (-18.33645465718485, -128.86248021615685, 7.139076836320745),
    ]]
    fillet(fillet4_edges, radius=FILLET4_R)


solid = part.part
